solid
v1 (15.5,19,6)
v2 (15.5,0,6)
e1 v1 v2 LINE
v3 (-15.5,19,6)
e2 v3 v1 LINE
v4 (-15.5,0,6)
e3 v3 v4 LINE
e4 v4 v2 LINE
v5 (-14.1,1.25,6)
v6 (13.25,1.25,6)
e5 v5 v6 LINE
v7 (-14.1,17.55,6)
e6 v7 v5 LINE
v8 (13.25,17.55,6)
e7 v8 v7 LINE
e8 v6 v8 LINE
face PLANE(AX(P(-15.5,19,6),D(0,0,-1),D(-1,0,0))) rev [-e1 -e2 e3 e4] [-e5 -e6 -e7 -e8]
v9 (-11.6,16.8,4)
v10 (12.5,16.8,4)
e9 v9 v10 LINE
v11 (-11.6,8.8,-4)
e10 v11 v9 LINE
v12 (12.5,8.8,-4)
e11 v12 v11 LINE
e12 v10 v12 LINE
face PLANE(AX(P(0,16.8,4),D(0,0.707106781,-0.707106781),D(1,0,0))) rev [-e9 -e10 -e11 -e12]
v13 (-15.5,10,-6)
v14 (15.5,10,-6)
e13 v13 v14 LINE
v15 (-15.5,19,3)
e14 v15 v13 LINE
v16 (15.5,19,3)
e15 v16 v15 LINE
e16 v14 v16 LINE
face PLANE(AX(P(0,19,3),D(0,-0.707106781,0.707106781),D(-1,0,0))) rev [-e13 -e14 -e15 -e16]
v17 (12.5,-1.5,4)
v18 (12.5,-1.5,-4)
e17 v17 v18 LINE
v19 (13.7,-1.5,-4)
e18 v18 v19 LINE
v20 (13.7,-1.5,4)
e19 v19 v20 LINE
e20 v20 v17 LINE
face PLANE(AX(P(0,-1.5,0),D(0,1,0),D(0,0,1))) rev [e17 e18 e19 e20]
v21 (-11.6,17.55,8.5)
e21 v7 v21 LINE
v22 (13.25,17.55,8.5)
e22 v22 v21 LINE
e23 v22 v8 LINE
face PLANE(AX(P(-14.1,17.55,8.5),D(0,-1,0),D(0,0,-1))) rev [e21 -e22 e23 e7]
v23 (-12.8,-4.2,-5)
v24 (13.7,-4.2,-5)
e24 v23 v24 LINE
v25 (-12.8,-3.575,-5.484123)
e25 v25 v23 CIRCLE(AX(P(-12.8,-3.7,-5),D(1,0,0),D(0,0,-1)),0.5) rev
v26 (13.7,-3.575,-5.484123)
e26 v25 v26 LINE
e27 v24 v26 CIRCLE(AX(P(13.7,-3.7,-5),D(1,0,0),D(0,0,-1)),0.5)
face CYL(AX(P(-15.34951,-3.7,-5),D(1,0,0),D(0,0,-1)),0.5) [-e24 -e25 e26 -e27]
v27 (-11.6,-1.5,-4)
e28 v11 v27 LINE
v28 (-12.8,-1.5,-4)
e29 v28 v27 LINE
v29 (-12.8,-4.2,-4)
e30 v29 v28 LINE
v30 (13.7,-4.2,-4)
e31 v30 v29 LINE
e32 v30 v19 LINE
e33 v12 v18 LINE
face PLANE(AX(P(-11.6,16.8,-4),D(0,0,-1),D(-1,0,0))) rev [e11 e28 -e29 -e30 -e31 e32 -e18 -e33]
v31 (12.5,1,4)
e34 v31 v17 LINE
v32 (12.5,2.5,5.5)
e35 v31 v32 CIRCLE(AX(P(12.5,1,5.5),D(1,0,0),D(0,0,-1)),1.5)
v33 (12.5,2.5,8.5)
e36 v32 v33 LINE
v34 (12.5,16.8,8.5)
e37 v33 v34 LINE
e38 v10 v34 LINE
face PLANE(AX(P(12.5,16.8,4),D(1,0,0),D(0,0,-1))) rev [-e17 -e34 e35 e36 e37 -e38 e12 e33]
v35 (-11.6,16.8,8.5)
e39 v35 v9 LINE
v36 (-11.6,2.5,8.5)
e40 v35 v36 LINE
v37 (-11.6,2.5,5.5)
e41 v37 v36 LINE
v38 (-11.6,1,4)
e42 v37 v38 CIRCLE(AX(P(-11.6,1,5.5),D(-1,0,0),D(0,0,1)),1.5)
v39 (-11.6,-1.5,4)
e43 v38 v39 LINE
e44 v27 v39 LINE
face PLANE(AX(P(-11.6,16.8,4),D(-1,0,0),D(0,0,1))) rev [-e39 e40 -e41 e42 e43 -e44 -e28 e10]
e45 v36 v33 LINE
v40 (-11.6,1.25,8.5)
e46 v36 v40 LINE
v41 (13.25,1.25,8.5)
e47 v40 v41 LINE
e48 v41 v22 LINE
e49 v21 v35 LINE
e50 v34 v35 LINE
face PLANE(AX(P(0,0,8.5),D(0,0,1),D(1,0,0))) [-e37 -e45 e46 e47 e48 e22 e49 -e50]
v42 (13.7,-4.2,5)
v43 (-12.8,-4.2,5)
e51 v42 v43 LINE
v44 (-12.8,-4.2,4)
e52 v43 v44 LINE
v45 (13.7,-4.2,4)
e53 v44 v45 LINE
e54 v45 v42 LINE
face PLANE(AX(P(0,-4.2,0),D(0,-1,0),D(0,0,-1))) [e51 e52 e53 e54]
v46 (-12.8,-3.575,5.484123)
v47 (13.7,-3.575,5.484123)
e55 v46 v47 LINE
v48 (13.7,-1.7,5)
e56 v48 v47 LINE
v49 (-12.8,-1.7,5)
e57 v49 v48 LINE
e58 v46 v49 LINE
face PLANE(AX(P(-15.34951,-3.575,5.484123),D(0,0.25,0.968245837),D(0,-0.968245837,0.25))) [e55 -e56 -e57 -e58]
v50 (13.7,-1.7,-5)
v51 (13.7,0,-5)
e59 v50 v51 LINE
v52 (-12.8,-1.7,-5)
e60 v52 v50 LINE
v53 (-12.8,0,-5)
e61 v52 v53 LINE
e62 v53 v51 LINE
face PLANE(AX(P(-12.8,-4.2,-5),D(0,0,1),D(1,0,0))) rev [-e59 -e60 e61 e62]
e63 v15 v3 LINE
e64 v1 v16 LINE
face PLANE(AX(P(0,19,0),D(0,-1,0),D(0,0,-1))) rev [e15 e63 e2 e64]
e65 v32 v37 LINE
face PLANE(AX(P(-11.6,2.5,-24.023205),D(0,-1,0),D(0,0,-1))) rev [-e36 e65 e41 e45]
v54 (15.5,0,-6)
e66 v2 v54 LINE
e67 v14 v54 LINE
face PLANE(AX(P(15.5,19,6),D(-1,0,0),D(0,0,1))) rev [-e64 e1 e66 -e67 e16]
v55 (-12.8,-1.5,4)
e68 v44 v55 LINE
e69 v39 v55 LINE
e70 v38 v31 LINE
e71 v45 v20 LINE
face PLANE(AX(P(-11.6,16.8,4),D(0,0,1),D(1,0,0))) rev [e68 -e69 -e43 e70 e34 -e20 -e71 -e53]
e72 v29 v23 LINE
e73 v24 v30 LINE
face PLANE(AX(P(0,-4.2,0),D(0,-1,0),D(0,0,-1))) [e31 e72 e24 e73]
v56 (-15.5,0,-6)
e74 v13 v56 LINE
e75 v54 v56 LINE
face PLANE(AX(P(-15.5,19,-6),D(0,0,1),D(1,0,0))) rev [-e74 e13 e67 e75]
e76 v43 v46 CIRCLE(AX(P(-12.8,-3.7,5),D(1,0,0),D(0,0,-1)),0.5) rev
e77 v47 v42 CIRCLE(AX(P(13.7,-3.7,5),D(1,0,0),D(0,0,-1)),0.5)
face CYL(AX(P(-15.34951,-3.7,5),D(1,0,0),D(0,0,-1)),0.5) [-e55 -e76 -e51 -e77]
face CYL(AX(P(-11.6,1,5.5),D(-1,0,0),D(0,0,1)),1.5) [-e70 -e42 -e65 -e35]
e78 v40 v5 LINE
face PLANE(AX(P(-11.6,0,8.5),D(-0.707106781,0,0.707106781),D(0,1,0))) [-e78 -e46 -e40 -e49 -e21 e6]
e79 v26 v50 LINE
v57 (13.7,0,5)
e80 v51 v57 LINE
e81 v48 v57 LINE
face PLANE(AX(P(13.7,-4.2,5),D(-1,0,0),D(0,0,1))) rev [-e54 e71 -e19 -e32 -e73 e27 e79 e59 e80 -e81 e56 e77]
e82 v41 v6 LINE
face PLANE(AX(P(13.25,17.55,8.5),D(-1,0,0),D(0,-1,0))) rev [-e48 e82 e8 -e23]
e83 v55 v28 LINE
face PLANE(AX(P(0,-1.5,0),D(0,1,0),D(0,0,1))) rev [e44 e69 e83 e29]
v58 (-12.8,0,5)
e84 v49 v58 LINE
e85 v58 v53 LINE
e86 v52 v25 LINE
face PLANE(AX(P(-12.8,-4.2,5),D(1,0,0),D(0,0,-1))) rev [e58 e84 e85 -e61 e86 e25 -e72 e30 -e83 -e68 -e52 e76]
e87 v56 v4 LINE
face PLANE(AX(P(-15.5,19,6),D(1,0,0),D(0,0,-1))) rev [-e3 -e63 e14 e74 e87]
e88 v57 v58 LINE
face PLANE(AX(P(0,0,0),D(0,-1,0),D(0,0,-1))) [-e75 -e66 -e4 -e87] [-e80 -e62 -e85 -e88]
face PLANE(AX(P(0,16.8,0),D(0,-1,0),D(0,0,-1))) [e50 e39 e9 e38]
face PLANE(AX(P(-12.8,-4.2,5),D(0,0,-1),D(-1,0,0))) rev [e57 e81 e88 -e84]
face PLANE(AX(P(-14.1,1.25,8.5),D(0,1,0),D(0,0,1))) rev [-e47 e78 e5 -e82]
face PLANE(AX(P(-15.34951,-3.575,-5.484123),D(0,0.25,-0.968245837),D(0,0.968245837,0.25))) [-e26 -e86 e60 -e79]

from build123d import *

# Parameters (mm, degrees)
SKETCH1_W           = 31
SKETCH1_H           = 12
BOSS_EXTRUDE1_DEPTH = 19
SKETCH2_W           = 24.1
SKETCH2_H           = 8
CUT_EXTRUDE1_DEPTH  = 16.8
SKETCH3_W           = 24.1
SKETCH3_H           = 14.3
CUT_EXTRUDE2_DEPTH  = 2
FILLET1_SIZE        = 8
FILLET2_SIZE        = 9
SKETCH6_W           = 26.5
SKETCH6_H           = 1
BOSS_EXTRUDE3_DEPTH = 4.2
BOSS_EXTRUDE6_DEPTH = 26.5
SKETCH15_W          = 1.2
SKETCH15_H          = 8
BOSS_EXTRUDE7_DEPTH = 1.5
SKETCH4_W           = 27.35
SKETCH4_H           = 16.3
SKETCH4_W_2         = 24.1
SKETCH4_H_2         = 14.3
BOSS_EXTRUDE2_DEPTH = 2.5
CHAMFER1_SIZE       = 2.5
FILLET3_R           = 1.5


with BuildPart() as part:
    # Sketch1 → Boss-Extrude1 (new body)
    with BuildSketch(Plane(origin=(0, 0, 0), x_dir=(1, 0, 0), z_dir=(0, 1, 0))):
        Rectangle(SKETCH1_W, SKETCH1_H)
    extrude(amount=BOSS_EXTRUDE1_DEPTH)

    # Sketch2 → Cut-Extrude1 (cut)
    with BuildSketch(Plane.XZ):
        with Locations((0.45, 0)):
            Rectangle(SKETCH2_W, SKETCH2_H)
    extrude(amount=-CUT_EXTRUDE1_DEPTH, mode=Mode.SUBTRACT)

    # Sketch3 → Cut-Extrude2 (cut)
    with BuildSketch(Plane.XY.offset(6)):
        with Locations((0.45, 9.65)):
            Rectangle(SKETCH3_W, SKETCH3_H)
    extrude(amount=-CUT_EXTRUDE2_DEPTH, mode=Mode.SUBTRACT)

    # Fillet1
    fillet1_edges = [part.edges().sort_by_distance(p)[0] for p in [
        (0.45, 16.8, -4),
    ]]
    chamfer(fillet1_edges, length=FILLET1_SIZE)

    # Fillet2
    fillet2_edges = [part.edges().sort_by_distance(p)[0] for p in [
        (0, 19, -6),
    ]]
    chamfer(fillet2_edges, length=FILLET2_SIZE)

    # Sketch6 → Boss-Extrude3 (add)
    with BuildSketch(Plane.XZ):
        with Locations((0.45, 4.5)):
            Rectangle(SKETCH6_W, SKETCH6_H)
        with Locations((0.45, -4.5)):
            Rectangle(SKETCH6_W, SKETCH6_H)
    extrude(amount=BOSS_EXTRUDE3_DEPTH)

    # Sketch14 → Boss-Extrude6 (add)
    with BuildSketch(Plane(origin=(13.7, 0, 0), x_dir=(0, 0, -1), z_dir=(1, 0, 0))):
        with BuildLine():
            Line((5.484122918, -3.575), (5, -1.7))
            Line((5, -1.7), (5, -4.2))
            ThreePointArc((5, -4.2), (5.395284708, -4.006186218), (5.484122918, -3.575))
        make_face()
        with BuildLine():
            Line((-5, -4.2), (-5, -1.7))
            Line((-5, -1.7), (-5.484122918, -3.575))
            ThreePointArc((-5.484122918, -3.575), (-5.395284708, -4.006186218), (-5, -4.2))
        make_face()
    extrude(amount=-BOSS_EXTRUDE6_DEPTH)

    # Sketch15 → Boss-Extrude7 (add)
    with BuildSketch(Plane.XZ):
        with Locations((-12.2, 0)):
            Rectangle(SKETCH15_W, SKETCH15_H)
        with Locations((13.1, 0)):
            Rectangle(SKETCH15_W, SKETCH15_H)
    extrude(amount=BOSS_EXTRUDE7_DEPTH)

    # Sketch4 → Boss-Extrude2 (add)
    with BuildSketch(Plane.XY.offset(6)):
        with Locations((-0.425, 9.4)):
            Rectangle(SKETCH4_W, SKETCH4_H)
        with Locations((0.45, 9.65)):
            Rectangle(SKETCH4_W_2, SKETCH4_H_2, mode=Mode.SUBTRACT)
    extrude(amount=BOSS_EXTRUDE2_DEPTH)

    # Chamfer1
    chamfer1_edges = [part.edges().sort_by_distance(p)[0] for p in [
        (-14.1, 9.4, 8.5),
    ]]
    chamfer(chamfer1_edges, length=CHAMFER1_SIZE - 0.0001)  # a hair under: the kernel refuses the full size

    # Fillet3
    fillet3_edges = [part.edges().sort_by_distance(p)[0] for p in [
        (0.45, 2.5, 4),
    ]]
    fillet(fillet3_edges, radius=FILLET3_R)


solid = part.part
